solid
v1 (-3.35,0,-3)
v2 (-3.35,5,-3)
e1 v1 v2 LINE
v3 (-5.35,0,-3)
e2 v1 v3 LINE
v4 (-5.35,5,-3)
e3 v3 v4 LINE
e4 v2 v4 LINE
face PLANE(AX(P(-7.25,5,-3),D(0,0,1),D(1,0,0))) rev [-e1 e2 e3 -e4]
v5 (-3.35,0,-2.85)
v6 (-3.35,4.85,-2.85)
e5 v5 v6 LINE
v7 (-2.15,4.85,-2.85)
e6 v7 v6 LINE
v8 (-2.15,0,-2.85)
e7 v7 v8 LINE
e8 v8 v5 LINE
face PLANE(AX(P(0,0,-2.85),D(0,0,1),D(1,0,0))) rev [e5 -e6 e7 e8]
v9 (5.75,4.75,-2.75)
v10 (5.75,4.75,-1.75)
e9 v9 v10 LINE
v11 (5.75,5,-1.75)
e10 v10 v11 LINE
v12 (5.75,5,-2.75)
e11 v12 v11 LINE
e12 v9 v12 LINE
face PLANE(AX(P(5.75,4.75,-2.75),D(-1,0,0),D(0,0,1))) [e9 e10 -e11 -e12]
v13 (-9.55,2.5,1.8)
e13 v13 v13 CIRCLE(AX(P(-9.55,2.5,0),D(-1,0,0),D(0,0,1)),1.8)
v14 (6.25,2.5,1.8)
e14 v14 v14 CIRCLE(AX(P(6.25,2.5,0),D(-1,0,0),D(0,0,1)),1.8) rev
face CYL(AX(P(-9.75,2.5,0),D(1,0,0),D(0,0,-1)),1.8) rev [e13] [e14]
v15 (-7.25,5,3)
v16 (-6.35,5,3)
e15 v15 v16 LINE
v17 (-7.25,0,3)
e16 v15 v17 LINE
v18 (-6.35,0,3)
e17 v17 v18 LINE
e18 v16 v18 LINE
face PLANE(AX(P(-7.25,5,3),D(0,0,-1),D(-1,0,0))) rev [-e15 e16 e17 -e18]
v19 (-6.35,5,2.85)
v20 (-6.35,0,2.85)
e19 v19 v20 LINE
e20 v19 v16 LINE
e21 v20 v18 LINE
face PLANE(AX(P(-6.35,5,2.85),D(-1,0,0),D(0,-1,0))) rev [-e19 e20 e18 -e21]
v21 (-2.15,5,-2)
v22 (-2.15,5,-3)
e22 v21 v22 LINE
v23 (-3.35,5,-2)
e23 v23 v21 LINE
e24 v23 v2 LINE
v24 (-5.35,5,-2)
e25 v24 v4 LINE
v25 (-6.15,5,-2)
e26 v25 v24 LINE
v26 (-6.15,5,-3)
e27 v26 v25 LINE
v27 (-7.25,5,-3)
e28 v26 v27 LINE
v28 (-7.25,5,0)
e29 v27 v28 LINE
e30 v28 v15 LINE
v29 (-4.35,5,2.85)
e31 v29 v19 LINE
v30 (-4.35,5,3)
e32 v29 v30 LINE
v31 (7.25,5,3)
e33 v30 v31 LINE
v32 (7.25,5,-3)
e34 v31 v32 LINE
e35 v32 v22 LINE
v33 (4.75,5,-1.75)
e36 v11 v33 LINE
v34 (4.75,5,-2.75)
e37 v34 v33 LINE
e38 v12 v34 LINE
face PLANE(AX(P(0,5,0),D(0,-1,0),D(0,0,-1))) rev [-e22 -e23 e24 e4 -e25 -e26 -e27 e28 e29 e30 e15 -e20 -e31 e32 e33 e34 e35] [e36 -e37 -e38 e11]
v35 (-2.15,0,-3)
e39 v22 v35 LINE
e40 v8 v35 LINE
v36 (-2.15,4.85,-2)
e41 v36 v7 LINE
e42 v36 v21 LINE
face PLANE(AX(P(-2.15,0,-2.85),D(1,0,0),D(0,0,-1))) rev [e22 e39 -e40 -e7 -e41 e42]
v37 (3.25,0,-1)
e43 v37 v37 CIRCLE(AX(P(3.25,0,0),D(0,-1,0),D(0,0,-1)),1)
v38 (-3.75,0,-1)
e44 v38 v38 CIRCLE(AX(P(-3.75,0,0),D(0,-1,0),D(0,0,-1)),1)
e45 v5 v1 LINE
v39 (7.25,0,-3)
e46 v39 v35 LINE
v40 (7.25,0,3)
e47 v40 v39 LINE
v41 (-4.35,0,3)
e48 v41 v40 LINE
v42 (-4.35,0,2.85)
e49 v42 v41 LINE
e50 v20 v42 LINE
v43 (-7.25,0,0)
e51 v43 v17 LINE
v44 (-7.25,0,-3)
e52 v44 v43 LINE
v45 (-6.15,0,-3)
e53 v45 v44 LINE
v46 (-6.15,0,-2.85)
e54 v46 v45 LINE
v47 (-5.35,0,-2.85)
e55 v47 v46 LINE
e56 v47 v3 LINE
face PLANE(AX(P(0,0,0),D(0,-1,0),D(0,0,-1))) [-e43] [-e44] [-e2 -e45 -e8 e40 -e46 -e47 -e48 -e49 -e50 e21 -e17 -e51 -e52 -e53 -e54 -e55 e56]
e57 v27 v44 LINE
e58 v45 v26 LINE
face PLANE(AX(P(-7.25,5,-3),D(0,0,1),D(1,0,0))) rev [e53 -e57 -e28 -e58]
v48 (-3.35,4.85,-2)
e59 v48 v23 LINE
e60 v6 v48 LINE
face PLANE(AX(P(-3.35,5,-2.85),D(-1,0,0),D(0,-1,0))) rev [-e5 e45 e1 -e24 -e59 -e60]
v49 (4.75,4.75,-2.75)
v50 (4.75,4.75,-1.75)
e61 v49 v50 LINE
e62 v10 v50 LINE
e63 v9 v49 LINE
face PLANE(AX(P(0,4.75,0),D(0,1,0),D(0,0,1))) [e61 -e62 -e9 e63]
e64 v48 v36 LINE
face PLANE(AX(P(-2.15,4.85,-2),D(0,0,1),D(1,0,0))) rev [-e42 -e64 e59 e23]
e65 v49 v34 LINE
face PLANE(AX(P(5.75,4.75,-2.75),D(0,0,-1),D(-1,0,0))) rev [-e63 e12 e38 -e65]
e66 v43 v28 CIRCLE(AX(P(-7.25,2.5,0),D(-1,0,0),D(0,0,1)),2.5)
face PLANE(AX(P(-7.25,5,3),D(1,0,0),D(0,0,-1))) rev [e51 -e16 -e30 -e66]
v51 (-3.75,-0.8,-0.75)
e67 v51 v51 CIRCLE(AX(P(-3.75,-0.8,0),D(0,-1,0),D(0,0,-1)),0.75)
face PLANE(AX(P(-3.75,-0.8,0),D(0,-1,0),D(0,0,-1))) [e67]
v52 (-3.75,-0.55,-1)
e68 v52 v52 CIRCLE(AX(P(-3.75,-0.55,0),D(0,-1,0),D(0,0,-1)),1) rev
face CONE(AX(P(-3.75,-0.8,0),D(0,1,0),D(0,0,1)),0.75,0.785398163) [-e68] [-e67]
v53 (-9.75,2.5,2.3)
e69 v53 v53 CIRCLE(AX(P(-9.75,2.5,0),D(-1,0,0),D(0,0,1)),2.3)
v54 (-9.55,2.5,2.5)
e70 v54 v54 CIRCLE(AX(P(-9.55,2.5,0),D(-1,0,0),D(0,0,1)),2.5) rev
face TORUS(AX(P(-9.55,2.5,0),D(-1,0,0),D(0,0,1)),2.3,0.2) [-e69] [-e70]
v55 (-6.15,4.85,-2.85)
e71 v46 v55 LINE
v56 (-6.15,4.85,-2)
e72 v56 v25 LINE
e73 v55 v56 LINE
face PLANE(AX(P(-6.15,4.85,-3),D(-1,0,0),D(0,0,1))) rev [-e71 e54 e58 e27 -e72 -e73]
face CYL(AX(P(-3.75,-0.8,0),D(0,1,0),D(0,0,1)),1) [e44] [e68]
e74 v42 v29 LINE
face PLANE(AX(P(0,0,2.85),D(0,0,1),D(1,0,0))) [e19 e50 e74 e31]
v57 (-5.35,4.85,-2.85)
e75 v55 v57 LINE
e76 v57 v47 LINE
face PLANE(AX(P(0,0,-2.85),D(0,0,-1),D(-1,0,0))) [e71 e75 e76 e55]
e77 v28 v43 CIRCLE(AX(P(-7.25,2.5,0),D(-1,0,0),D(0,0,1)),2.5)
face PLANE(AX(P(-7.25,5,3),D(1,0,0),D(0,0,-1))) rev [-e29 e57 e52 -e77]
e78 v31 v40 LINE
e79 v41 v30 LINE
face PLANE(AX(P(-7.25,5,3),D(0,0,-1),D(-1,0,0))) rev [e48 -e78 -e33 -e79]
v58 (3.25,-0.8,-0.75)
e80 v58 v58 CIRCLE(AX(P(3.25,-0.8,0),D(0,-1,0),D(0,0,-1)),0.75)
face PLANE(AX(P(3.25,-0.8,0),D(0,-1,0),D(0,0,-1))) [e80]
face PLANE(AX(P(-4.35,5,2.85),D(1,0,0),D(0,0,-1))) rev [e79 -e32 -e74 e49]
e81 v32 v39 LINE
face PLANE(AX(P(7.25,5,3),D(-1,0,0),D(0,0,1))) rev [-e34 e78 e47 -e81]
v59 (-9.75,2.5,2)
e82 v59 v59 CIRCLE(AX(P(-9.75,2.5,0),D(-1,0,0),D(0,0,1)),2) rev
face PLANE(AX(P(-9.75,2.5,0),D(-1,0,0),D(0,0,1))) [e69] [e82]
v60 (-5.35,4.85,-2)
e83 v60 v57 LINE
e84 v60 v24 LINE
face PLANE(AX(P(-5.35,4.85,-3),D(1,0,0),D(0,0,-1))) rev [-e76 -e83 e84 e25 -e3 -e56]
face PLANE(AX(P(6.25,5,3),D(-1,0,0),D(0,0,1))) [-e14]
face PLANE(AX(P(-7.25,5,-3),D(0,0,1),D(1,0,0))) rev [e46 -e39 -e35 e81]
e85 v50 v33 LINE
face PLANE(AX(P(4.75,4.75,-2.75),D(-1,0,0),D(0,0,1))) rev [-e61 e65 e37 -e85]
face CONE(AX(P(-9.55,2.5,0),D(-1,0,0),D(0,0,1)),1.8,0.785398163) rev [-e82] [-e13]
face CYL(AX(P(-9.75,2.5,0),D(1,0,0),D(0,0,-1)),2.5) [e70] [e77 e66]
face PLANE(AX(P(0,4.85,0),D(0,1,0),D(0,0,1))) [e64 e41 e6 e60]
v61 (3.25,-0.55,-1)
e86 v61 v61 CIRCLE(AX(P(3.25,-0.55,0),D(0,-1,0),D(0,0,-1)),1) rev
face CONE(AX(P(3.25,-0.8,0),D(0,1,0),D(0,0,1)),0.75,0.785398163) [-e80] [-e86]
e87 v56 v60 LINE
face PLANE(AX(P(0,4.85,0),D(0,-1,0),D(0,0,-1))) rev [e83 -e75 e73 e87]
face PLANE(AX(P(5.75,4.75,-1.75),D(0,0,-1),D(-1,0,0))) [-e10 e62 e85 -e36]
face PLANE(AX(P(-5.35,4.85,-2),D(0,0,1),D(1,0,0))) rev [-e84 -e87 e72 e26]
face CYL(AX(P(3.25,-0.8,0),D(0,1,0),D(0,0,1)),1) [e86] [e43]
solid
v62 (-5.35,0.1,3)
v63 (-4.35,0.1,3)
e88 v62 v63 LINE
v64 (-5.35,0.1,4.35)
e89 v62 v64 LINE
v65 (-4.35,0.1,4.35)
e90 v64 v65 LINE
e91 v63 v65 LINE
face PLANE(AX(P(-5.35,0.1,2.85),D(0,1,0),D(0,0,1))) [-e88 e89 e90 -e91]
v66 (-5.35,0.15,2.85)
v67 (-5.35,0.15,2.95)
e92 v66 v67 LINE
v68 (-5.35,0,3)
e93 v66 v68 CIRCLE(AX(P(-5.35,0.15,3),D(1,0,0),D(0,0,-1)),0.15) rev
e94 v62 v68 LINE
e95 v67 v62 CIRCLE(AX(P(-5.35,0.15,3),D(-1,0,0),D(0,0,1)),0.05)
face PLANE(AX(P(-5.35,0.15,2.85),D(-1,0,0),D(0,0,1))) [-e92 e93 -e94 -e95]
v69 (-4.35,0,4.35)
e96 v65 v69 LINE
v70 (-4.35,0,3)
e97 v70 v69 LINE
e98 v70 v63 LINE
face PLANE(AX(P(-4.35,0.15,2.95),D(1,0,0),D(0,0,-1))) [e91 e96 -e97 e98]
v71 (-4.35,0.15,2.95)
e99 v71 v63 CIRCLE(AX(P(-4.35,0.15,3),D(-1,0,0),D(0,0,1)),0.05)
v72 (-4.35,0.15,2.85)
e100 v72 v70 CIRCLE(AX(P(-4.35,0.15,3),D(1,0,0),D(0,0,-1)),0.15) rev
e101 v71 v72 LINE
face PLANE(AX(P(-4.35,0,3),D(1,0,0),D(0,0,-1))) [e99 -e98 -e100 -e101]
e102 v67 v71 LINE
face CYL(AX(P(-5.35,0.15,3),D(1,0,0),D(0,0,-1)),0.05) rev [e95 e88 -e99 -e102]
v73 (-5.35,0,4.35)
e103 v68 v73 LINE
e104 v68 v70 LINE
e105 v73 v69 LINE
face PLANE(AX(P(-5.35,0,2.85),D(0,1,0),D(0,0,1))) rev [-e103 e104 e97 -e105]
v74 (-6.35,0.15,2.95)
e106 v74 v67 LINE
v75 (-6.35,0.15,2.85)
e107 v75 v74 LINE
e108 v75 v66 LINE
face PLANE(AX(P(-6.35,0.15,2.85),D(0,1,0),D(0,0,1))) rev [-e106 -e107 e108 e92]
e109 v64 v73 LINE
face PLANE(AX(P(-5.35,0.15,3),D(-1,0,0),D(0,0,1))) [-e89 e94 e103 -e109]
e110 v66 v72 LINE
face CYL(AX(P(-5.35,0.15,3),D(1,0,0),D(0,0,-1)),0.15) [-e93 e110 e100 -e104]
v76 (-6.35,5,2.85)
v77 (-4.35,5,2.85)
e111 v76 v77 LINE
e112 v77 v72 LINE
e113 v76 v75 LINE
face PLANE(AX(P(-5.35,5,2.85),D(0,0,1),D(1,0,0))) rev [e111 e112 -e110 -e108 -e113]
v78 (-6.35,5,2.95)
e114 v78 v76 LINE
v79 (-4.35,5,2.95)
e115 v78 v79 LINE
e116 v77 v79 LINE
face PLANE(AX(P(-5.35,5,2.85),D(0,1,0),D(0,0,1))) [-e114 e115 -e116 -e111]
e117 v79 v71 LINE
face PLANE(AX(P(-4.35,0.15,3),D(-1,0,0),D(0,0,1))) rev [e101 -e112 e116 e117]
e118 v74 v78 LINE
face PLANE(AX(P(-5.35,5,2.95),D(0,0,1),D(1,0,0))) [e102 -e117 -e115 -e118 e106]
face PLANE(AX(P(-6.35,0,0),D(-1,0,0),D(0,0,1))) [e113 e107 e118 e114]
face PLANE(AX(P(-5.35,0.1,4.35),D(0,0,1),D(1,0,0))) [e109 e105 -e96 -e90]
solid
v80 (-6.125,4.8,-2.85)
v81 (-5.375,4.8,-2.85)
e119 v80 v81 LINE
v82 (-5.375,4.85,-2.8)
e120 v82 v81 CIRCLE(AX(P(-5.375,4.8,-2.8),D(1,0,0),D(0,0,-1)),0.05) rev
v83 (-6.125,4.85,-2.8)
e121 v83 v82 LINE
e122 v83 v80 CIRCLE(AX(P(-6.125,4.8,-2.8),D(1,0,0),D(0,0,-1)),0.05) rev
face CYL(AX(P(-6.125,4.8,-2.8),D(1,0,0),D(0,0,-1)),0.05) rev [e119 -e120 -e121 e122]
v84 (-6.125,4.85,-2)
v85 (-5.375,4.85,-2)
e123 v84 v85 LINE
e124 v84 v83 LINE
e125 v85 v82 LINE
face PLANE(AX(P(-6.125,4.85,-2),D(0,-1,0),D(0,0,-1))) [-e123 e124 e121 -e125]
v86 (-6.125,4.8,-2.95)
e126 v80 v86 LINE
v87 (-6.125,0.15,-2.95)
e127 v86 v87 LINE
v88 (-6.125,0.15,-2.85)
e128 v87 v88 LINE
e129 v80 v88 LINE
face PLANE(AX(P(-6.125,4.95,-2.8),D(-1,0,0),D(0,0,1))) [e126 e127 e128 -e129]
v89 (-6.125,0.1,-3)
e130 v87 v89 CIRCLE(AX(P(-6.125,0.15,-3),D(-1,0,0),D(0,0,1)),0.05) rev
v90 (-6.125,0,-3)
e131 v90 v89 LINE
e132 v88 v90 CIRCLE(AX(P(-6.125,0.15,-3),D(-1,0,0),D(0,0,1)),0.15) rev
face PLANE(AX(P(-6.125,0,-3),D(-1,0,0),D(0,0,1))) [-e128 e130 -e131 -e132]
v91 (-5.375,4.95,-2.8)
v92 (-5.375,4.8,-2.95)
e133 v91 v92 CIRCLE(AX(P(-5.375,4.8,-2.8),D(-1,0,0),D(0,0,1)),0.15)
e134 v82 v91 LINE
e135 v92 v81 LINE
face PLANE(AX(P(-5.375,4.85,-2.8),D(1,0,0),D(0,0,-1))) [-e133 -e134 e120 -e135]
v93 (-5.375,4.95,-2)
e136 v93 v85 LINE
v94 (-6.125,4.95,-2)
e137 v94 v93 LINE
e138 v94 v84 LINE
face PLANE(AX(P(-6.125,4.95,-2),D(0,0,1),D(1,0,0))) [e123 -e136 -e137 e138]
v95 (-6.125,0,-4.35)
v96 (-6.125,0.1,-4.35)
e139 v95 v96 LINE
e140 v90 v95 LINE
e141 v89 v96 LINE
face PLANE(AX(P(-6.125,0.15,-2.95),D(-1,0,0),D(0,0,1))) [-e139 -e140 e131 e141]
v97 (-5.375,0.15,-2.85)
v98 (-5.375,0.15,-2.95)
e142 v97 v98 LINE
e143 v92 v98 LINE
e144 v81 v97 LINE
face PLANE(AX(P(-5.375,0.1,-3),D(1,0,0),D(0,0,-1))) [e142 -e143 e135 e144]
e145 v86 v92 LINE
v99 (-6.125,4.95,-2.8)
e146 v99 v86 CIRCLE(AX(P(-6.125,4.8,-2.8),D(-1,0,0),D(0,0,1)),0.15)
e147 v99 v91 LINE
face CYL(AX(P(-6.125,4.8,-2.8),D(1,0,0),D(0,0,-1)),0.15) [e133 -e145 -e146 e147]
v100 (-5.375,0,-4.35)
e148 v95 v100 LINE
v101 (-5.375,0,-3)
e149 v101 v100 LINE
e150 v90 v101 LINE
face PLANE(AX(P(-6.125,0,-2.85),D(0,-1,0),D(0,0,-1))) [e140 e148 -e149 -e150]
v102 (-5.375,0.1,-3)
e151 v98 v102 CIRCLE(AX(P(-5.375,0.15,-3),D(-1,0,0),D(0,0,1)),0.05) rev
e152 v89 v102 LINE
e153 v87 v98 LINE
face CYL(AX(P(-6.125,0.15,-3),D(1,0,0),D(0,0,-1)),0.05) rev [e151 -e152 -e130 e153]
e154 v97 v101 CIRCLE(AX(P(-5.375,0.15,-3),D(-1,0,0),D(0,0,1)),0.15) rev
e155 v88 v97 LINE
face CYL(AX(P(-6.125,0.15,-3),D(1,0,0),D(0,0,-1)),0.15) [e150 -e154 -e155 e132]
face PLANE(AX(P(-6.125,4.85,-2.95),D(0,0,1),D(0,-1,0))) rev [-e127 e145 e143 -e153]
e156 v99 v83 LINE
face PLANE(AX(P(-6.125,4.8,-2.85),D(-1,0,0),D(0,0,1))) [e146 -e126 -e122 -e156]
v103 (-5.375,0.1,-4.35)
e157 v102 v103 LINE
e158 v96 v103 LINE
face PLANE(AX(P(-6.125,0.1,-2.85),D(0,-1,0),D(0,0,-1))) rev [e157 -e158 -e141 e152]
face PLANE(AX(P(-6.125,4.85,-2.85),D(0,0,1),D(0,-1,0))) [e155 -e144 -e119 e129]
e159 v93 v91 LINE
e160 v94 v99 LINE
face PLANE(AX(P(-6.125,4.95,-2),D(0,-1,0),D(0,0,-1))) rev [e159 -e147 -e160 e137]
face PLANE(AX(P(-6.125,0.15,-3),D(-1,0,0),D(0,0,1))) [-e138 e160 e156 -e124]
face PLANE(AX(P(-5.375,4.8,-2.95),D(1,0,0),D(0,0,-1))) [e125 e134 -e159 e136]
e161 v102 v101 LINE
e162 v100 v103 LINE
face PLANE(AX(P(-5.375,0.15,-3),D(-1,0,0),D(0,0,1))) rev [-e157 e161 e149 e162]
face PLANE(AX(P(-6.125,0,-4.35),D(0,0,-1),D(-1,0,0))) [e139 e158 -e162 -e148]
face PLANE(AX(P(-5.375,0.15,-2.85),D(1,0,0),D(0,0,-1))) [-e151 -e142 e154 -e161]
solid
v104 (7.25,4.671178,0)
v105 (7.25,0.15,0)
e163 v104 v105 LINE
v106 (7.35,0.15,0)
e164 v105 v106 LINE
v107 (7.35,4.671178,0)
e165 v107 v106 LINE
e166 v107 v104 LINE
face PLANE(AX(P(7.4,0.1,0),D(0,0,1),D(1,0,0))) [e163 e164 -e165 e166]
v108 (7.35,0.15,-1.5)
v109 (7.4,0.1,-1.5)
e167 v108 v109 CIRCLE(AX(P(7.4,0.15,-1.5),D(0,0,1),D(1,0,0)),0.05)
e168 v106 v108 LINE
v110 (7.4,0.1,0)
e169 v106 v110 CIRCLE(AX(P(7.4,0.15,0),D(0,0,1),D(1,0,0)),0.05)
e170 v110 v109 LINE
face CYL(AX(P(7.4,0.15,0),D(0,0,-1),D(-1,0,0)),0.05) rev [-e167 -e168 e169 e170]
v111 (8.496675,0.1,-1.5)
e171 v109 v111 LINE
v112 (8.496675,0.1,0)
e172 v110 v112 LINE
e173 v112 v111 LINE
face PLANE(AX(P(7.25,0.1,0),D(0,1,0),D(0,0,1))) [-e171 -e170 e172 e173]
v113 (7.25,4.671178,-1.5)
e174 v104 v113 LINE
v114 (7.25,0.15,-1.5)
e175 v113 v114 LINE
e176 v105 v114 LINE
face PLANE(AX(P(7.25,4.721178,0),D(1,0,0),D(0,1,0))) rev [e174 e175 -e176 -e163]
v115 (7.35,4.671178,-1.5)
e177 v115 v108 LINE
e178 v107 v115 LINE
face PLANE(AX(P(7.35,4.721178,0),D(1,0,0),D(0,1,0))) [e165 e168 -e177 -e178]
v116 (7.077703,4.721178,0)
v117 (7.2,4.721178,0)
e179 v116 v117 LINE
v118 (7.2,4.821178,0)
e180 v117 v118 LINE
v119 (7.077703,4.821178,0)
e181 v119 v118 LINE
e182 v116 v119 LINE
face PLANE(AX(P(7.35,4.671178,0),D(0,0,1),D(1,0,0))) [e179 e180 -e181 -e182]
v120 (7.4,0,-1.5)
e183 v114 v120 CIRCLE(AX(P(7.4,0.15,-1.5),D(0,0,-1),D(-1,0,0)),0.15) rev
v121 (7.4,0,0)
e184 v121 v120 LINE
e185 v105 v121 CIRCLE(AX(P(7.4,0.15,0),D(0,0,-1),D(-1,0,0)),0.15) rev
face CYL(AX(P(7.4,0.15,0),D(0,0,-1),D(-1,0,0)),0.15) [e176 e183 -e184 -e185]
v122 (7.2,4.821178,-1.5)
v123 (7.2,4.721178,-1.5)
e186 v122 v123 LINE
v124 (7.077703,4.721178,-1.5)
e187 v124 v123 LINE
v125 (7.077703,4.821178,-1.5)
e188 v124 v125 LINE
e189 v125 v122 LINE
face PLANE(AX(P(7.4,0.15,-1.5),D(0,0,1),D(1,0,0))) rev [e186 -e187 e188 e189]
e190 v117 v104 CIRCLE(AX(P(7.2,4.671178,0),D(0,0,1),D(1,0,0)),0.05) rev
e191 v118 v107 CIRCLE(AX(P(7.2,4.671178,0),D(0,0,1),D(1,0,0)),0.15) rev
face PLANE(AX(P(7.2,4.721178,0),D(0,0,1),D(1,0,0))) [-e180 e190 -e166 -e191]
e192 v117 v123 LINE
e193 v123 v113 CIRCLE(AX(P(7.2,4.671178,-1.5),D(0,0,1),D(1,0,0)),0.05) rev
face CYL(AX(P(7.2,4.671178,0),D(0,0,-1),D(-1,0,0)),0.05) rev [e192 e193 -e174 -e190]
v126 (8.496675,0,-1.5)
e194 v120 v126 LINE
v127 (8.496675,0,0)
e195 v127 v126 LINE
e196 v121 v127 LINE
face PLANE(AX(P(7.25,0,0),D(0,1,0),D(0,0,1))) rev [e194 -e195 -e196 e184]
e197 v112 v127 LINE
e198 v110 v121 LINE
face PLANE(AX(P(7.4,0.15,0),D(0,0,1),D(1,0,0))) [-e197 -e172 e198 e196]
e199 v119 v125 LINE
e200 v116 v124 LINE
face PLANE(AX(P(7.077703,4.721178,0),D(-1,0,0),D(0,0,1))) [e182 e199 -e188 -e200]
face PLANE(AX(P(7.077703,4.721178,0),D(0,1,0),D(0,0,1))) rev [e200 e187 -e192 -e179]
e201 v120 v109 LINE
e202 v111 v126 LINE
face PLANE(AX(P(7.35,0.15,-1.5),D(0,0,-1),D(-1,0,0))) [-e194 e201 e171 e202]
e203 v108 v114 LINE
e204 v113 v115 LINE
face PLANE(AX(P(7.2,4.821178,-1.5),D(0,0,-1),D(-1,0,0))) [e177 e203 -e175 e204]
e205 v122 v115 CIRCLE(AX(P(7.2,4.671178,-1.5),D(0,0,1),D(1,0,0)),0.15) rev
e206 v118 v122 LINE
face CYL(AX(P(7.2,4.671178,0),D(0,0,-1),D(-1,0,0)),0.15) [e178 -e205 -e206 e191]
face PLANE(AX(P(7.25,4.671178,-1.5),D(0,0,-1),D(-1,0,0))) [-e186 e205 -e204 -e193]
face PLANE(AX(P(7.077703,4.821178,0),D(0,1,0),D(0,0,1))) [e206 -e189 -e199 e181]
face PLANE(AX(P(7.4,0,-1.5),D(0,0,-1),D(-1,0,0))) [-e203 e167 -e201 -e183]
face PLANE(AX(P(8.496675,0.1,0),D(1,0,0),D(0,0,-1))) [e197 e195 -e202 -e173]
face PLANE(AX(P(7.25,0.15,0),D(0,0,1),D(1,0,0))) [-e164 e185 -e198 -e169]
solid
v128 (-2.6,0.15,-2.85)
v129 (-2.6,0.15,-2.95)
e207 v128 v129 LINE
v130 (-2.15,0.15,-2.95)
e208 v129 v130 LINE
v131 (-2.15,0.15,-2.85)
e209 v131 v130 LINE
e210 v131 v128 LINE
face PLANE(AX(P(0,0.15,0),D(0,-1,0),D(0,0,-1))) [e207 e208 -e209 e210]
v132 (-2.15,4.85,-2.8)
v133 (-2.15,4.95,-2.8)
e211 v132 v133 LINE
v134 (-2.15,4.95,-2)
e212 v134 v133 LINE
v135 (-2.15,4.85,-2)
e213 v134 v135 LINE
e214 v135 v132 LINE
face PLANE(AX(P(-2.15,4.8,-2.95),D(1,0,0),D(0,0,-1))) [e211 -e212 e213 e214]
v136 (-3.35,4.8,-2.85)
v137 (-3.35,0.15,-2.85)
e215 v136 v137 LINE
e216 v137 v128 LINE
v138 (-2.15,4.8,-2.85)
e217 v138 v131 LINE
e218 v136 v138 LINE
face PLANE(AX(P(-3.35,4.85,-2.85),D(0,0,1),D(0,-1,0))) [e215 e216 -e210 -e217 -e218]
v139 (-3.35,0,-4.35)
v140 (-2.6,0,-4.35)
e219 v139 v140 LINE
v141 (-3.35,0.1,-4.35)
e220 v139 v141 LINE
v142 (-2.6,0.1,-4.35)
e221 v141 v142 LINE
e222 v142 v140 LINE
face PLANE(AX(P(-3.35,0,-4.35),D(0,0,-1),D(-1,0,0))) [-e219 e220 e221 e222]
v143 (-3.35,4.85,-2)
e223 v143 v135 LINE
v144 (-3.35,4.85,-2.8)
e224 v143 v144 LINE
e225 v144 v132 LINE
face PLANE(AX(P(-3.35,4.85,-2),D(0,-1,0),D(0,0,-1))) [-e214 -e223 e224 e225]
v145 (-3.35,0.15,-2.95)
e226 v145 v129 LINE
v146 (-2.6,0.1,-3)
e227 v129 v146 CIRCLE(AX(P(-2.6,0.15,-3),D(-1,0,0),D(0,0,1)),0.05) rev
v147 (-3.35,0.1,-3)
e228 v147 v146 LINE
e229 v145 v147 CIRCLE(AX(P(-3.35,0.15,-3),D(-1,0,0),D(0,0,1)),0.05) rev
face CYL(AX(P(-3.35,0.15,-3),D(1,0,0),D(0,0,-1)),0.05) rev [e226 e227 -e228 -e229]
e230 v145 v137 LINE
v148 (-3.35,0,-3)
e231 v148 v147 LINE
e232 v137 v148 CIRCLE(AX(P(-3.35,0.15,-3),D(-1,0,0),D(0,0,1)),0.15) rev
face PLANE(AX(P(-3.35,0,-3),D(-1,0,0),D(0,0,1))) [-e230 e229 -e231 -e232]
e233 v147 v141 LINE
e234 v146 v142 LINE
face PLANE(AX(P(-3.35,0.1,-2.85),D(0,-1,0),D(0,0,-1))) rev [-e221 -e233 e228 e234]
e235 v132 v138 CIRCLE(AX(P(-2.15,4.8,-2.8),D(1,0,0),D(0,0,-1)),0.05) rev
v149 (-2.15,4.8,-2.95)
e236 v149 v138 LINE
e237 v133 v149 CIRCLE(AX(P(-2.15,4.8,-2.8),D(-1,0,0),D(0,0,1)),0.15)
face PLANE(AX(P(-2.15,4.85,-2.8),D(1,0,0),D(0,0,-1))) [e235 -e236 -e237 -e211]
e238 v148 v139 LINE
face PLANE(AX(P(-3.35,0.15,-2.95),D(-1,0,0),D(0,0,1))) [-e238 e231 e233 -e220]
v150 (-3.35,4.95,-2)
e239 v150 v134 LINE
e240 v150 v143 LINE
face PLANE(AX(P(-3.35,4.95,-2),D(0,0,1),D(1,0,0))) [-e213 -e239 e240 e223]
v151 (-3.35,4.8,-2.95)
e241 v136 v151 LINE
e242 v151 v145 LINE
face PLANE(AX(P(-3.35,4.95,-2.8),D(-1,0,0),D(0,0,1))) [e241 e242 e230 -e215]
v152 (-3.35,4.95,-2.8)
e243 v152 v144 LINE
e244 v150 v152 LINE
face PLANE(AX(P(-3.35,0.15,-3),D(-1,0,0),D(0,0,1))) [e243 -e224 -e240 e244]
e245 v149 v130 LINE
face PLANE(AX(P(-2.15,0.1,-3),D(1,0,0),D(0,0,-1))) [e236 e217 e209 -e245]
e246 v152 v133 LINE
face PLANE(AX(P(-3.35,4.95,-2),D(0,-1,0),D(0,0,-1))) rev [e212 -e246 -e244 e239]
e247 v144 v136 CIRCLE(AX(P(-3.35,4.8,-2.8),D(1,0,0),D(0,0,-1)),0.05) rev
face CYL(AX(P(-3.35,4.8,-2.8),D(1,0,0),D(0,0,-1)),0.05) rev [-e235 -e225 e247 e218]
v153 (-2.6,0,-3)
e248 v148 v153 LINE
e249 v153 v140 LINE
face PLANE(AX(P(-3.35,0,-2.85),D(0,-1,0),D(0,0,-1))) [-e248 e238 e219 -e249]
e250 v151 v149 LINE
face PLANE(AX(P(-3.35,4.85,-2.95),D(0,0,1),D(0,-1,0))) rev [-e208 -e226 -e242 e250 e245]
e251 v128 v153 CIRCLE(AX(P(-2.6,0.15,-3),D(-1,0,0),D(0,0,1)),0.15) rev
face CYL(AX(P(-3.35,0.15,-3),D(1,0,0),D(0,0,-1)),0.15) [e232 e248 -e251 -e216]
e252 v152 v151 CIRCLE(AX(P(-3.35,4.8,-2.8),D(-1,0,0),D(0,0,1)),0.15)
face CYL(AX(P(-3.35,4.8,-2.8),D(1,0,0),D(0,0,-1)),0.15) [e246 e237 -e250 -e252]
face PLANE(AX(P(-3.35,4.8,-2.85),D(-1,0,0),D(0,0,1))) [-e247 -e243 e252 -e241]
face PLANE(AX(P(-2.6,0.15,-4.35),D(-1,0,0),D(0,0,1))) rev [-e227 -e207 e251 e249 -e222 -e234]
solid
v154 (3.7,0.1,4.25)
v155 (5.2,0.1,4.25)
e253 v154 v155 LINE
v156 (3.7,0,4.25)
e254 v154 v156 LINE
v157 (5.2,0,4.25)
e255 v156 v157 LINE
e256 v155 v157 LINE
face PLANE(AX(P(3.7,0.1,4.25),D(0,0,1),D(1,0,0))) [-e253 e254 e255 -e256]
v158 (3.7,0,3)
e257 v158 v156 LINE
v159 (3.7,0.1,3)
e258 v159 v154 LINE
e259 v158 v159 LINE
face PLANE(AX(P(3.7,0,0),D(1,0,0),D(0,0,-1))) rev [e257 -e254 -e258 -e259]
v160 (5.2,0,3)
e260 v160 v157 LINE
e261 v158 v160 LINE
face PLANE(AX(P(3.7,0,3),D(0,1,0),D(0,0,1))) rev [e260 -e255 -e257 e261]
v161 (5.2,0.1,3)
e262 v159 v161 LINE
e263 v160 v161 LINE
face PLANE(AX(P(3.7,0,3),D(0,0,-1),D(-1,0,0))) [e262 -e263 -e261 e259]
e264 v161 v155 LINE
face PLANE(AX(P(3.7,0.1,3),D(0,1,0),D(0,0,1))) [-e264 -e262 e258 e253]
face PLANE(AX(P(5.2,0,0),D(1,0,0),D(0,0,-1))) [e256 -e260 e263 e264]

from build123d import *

# Parameters (mm, degrees)
SKETCH1_W               = 14.5
SKETCH1_H               = 6
BOSS_EXTRUDE1_DEPTH     = 5
SKETCH2_R               = 2.5
SKETCH2_R_2             = 1.8
BOSS_EXTRUDE2_DEPTH     = 2.5
CUT_EXTRUDE1_START      = -13.5
SKETCH2_2_R             = 1.8
CUT_EXTRUDE1_DEPTH      = 13.5
SKETCH3_W               = 1
SKETCH3_H               = 1
CUT_EXTRUDE2_DEPTH      = 0.25
BASE_FLANGE1_DEPTH      = 0.75
SKETCH9_W               = 1.25
SKETCH9_H               = 0.1
BASE_FLANGE2_DEPTH      = 0.75
CUT_EXTRUDE3_DEPTH      = 0.15
BASE_FLANGE3_DEPTH      = 0.5
SKETCH17_W              = 0.1
SKETCH17_H              = 4.85
BOSS_EXTRUDE3_DEPTH     = 1
SKETCH20_W              = 0.8
SKETCH20_H              = 1
CUT_EXTRUDE4_DEPTH      = 0.15
SKETCH21_W              = 0.8
SKETCH21_H              = 5
CUT_EXTRUDE5_DEPTH      = 0.15
BASE_FLANGE4_DEPTH      = 0.375
CUT_EXTRUDE6_DEPTH      = 0.15
SKETCH27_W              = 1.2
SKETCH27_H              = 1
CUT_EXTRUDE7_DEPTH      = 0.15
BASE_FLANGE5_DEPTH      = 0.4
BASE_FLANGE5_DEPTH_BACK = 0.8
SKETCH31_W              = 0.45
SKETCH31_H              = 1.5
CUT_EXTRUDE8_DEPTH      = 0.15
CHAMFER1_SIZE           = 0.2
FILLET1_R               = 0.2
SKETCH33_R              = 1
BOSS_EXTRUDE4_DEPTH     = 0.8
CHAMFER2_SIZE           = 0.25


# Sheet-metal steps are written as plain solids
with BuildPart() as part:
    # Sketch1 → Boss-Extrude1 (new body)
    with BuildSketch(Plane(origin=(0, 0, 0), x_dir=(1, 0, 0), z_dir=(0, 1, 0))):
        Rectangle(SKETCH1_W, SKETCH1_H)
    extrude(amount=BOSS_EXTRUDE1_DEPTH)

    # Sketch2 → Boss-Extrude2 (add)
    with BuildSketch(Plane.ZY.offset(7.25)):
        with Locations(Location((0, 2.5, 0), (0, 0, 270))):
            Circle(SKETCH2_R)
        with Locations((0, 2.5)):
            Circle(SKETCH2_R_2, mode=Mode.SUBTRACT)
    extrude(amount=BOSS_EXTRUDE2_DEPTH)

    # Sketch2<2> → Cut-Extrude1 (cut)
    with BuildSketch(Plane.ZY.offset(7.25).offset(CUT_EXTRUDE1_START)):
        with Locations((0, 2.5)):
            Circle(SKETCH2_2_R)
    extrude(amount=CUT_EXTRUDE1_DEPTH, mode=Mode.SUBTRACT)

    # Sketch3 → Cut-Extrude2 (cut)
    with BuildSketch(Plane(origin=(0, 5, 0), x_dir=(1, 0, 0), z_dir=(0, 1, 0))):
        with Locations((5.25, 2.25)):
            Rectangle(SKETCH3_W, SKETCH3_H)
    extrude(amount=-CUT_EXTRUDE2_DEPTH, mode=Mode.SUBTRACT)

    # Sketch13 → Cut-Extrude3 (cut)
    with BuildSketch(Plane.XY.offset(3)):
        Polygon((-6.35, 5), (-4.85, 5), (-4.35, 5), (-4.35, 0), (-4.85, 0), (-6.35, 0), align=None)
    extrude(amount=-CUT_EXTRUDE3_DEPTH, mode=Mode.SUBTRACT)

    # Sketch20 → Cut-Extrude4 (cut)
    with BuildSketch(Plane(origin=(0, 5, 0), x_dir=(1, 0, 0), z_dir=(0, 1, 0))):
        with Locations((-5.75, 2.5)):
            Rectangle(SKETCH20_W, SKETCH20_H)
    extrude(amount=-CUT_EXTRUDE4_DEPTH, mode=Mode.SUBTRACT)

    # Sketch21 → Cut-Extrude5 (cut)
    with BuildSketch(Plane(origin=(0, 0, -3), x_dir=(-1, 0, 0), z_dir=(0, 0, -1))):
        with Locations((5.75, 2.5)):
            Rectangle(SKETCH21_W, SKETCH21_H)
    extrude(amount=-CUT_EXTRUDE5_DEPTH, mode=Mode.SUBTRACT)

    # Sketch26 → Cut-Extrude6 (cut)
    with BuildSketch(Plane(origin=(0, 0, -3), x_dir=(-1, 0, 0), z_dir=(0, 0, -1))):
        Polygon((2.95, 5), (3.35, 5), (3.35, 0), (2.95, 0), (2.15, 0), (2.15, 5), align=None)
    extrude(amount=-CUT_EXTRUDE6_DEPTH, mode=Mode.SUBTRACT)

    # Sketch27 → Cut-Extrude7 (cut)
    with BuildSketch(Plane(origin=(0, 5, 0), x_dir=(1, 0, 0), z_dir=(0, 1, 0))):
        with Locations((-2.75, 2.5)):
            Rectangle(SKETCH27_W, SKETCH27_H)
    extrude(amount=-CUT_EXTRUDE7_DEPTH, mode=Mode.SUBTRACT)

    # Chamfer1
    chamfer1_edges = [part.edges().sort_by_distance(p)[0] for p in [
        (-9.75, 2.5, -1.8),
    ]]
    chamfer(chamfer1_edges, length=CHAMFER1_SIZE)

    # Fillet1
    fillet1_edges = [part.edges().sort_by_distance(p)[0] for p in [
        (-9.75, 5, 0),
    ]]
    fillet(fillet1_edges, radius=FILLET1_R)

    # Sketch33 → Boss-Extrude4 (add)
    with BuildSketch(Plane.XZ):
        with Locations(Location((-3.75, 0, 0), (0, 0, 270))):
            Circle(SKETCH33_R)
        with Locations(Location((3.25, 0, 0), (0, 0, 270))):
            Circle(SKETCH33_R)
    extrude(amount=BOSS_EXTRUDE4_DEPTH)

    # Chamfer2
    chamfer2_edges = [part.edges().sort_by_distance(p)[0] for p in [
        (-3.75, -0.8, 1),
        (3.25, -0.8, 1),
    ]]
    chamfer(chamfer2_edges, length=CHAMFER2_SIZE)


with BuildPart() as body_2:
    # Sketch4 → Base-Flange1 (new, symmetric)
    with BuildSketch(Plane.XY.offset(-0.75)):
        with BuildLine():
            Line((7.077702631, 4.721178133), (7.2, 4.721178133))
            ThreePointArc((7.2, 4.721178133), (7.235355339, 4.706533472), (7.25, 4.671178133))
            Line((7.25, 4.671178133), (7.25, 0.15))
            ThreePointArc((7.25, 0.15), (7.293933983, 0.043933983), (7.4, 0))
            Line((7.4, 0), (8.496675231, 0))
            Line((8.496675231, 0), (8.496675231, 0.1))
            Line((8.496675231, 0.1), (7.4, 0.1))
            ThreePointArc((7.4, 0.1), (7.364644661, 0.114644661), (7.35, 0.15))
            Line((7.35, 0.15), (7.35, 4.671178133))
            ThreePointArc((7.35, 4.671178133), (7.306066017, 4.77724415), (7.2, 4.821178133))
            Line((7.2, 4.821178133), (7.077702631, 4.821178133))
            Line((7.077702631, 4.821178133), (7.077702631, 4.721178133))
        make_face()
    extrude(amount=BASE_FLANGE1_DEPTH, both=True)


with BuildPart() as body_3:
    # Sketch9 → Base-Flange2 (new, symmetric)
    with BuildSketch(Plane.ZY.offset(-4.45)):
        with Locations((3.625, 0.05)):
            Rectangle(SKETCH9_W, SKETCH9_H)
    extrude(amount=BASE_FLANGE2_DEPTH, both=True)


with BuildPart() as body_4:
    # Sketch14 → Base-Flange3 (new, symmetric)
    with BuildSketch(Plane.ZY.offset(4.85)):
        with BuildLine():
            Line((2.85, 5), (2.85, 0.15))
            ThreePointArc((2.85, 0.15), (2.893933983, 0.043933983), (3, 0))
            Line((3, 0), (4.35, 0))
            Line((4.35, 0), (4.35, 0.1))
            Line((4.35, 0.1), (3, 0.1))
            ThreePointArc((3, 0.1), (2.964644661, 0.114644661), (2.95, 0.15))
            Line((2.95, 0.15), (2.95, 5))
            Line((2.95, 5), (2.85, 5))
        make_face()
    extrude(amount=BASE_FLANGE3_DEPTH, both=True)

    # Sketch17 → Boss-Extrude3 (add)
    with BuildSketch(Plane.ZY.offset(5.35)):
        with Locations((2.9, 2.575)):
            Rectangle(SKETCH17_W, SKETCH17_H)
    extrude(amount=BOSS_EXTRUDE3_DEPTH)


with BuildPart() as body_5:
    # Sketch22 → Base-Flange4 (new, symmetric)
    with BuildSketch(Plane.ZY.offset(5.75)):
        with BuildLine():
            Line((-2, 4.85), (-2.8, 4.85))
            ThreePointArc((-2.8, 4.85), (-2.835355339, 4.835355339), (-2.85, 4.8))
            Line((-2.85, 4.8), (-2.85, 0.15))
            ThreePointArc((-2.85, 0.15), (-2.893933983, 0.043933983), (-3, 0))
            Line((-3, 0), (-4.35, 0))
            Line((-4.35, 0), (-4.35, 0.1))
            Line((-4.35, 0.1), (-3, 0.1))
            ThreePointArc((-3, 0.1), (-2.964644661, 0.114644661), (-2.95, 0.15))
            Line((-2.95, 0.15), (-2.95, 4.8))
            ThreePointArc((-2.95, 4.8), (-2.906066017, 4.906066017), (-2.8, 4.95))
            Line((-2.8, 4.95), (-2, 4.95))
            Line((-2, 4.95), (-2, 4.85))
        make_face()
    extrude(amount=BASE_FLANGE4_DEPTH, both=True)


with BuildPart() as body_6:
    # Sketch28 → Base-Flange5 (new, two sides: drawn at the far end of the back side and taken through both)
    with BuildSketch(Plane.ZY.offset(2.95).offset(-BASE_FLANGE5_DEPTH_BACK)):
        with BuildLine():
            Line((-2, 4.85), (-2.8, 4.85))
            ThreePointArc((-2.8, 4.85), (-2.835355339, 4.835355339), (-2.85, 4.8))
            Line((-2.85, 4.8), (-2.85, 0.15))
            ThreePointArc((-2.85, 0.15), (-2.893933983, 0.043933983), (-3, 0))
            Line((-3, 0), (-4.35, 0))
            Line((-4.35, 0), (-4.35, 0.1))
            Line((-4.35, 0.1), (-3, 0.1))
            ThreePointArc((-3, 0.1), (-2.964644661, 0.114644661), (-2.95, 0.15))
            Line((-2.95, 0.15), (-2.95, 4.8))
            ThreePointArc((-2.95, 4.8), (-2.906066017, 4.906066017), (-2.8, 4.95))
            Line((-2.8, 4.95), (-2, 4.95))
            Line((-2, 4.95), (-2, 4.85))
        make_face()
    extrude(amount=BASE_FLANGE5_DEPTH + BASE_FLANGE5_DEPTH_BACK)

    # Sketch31 → Cut-Extrude8 (cut)
    with BuildSketch(Plane.XZ):
        with Locations((-2.375, -3.6)):
            Rectangle(SKETCH31_W, SKETCH31_H)
    extrude(amount=-CUT_EXTRUDE8_DEPTH, mode=Mode.SUBTRACT)


solid = Compound([part.part, body_2.part, body_3.part, body_4.part, body_5.part, body_6.part])
